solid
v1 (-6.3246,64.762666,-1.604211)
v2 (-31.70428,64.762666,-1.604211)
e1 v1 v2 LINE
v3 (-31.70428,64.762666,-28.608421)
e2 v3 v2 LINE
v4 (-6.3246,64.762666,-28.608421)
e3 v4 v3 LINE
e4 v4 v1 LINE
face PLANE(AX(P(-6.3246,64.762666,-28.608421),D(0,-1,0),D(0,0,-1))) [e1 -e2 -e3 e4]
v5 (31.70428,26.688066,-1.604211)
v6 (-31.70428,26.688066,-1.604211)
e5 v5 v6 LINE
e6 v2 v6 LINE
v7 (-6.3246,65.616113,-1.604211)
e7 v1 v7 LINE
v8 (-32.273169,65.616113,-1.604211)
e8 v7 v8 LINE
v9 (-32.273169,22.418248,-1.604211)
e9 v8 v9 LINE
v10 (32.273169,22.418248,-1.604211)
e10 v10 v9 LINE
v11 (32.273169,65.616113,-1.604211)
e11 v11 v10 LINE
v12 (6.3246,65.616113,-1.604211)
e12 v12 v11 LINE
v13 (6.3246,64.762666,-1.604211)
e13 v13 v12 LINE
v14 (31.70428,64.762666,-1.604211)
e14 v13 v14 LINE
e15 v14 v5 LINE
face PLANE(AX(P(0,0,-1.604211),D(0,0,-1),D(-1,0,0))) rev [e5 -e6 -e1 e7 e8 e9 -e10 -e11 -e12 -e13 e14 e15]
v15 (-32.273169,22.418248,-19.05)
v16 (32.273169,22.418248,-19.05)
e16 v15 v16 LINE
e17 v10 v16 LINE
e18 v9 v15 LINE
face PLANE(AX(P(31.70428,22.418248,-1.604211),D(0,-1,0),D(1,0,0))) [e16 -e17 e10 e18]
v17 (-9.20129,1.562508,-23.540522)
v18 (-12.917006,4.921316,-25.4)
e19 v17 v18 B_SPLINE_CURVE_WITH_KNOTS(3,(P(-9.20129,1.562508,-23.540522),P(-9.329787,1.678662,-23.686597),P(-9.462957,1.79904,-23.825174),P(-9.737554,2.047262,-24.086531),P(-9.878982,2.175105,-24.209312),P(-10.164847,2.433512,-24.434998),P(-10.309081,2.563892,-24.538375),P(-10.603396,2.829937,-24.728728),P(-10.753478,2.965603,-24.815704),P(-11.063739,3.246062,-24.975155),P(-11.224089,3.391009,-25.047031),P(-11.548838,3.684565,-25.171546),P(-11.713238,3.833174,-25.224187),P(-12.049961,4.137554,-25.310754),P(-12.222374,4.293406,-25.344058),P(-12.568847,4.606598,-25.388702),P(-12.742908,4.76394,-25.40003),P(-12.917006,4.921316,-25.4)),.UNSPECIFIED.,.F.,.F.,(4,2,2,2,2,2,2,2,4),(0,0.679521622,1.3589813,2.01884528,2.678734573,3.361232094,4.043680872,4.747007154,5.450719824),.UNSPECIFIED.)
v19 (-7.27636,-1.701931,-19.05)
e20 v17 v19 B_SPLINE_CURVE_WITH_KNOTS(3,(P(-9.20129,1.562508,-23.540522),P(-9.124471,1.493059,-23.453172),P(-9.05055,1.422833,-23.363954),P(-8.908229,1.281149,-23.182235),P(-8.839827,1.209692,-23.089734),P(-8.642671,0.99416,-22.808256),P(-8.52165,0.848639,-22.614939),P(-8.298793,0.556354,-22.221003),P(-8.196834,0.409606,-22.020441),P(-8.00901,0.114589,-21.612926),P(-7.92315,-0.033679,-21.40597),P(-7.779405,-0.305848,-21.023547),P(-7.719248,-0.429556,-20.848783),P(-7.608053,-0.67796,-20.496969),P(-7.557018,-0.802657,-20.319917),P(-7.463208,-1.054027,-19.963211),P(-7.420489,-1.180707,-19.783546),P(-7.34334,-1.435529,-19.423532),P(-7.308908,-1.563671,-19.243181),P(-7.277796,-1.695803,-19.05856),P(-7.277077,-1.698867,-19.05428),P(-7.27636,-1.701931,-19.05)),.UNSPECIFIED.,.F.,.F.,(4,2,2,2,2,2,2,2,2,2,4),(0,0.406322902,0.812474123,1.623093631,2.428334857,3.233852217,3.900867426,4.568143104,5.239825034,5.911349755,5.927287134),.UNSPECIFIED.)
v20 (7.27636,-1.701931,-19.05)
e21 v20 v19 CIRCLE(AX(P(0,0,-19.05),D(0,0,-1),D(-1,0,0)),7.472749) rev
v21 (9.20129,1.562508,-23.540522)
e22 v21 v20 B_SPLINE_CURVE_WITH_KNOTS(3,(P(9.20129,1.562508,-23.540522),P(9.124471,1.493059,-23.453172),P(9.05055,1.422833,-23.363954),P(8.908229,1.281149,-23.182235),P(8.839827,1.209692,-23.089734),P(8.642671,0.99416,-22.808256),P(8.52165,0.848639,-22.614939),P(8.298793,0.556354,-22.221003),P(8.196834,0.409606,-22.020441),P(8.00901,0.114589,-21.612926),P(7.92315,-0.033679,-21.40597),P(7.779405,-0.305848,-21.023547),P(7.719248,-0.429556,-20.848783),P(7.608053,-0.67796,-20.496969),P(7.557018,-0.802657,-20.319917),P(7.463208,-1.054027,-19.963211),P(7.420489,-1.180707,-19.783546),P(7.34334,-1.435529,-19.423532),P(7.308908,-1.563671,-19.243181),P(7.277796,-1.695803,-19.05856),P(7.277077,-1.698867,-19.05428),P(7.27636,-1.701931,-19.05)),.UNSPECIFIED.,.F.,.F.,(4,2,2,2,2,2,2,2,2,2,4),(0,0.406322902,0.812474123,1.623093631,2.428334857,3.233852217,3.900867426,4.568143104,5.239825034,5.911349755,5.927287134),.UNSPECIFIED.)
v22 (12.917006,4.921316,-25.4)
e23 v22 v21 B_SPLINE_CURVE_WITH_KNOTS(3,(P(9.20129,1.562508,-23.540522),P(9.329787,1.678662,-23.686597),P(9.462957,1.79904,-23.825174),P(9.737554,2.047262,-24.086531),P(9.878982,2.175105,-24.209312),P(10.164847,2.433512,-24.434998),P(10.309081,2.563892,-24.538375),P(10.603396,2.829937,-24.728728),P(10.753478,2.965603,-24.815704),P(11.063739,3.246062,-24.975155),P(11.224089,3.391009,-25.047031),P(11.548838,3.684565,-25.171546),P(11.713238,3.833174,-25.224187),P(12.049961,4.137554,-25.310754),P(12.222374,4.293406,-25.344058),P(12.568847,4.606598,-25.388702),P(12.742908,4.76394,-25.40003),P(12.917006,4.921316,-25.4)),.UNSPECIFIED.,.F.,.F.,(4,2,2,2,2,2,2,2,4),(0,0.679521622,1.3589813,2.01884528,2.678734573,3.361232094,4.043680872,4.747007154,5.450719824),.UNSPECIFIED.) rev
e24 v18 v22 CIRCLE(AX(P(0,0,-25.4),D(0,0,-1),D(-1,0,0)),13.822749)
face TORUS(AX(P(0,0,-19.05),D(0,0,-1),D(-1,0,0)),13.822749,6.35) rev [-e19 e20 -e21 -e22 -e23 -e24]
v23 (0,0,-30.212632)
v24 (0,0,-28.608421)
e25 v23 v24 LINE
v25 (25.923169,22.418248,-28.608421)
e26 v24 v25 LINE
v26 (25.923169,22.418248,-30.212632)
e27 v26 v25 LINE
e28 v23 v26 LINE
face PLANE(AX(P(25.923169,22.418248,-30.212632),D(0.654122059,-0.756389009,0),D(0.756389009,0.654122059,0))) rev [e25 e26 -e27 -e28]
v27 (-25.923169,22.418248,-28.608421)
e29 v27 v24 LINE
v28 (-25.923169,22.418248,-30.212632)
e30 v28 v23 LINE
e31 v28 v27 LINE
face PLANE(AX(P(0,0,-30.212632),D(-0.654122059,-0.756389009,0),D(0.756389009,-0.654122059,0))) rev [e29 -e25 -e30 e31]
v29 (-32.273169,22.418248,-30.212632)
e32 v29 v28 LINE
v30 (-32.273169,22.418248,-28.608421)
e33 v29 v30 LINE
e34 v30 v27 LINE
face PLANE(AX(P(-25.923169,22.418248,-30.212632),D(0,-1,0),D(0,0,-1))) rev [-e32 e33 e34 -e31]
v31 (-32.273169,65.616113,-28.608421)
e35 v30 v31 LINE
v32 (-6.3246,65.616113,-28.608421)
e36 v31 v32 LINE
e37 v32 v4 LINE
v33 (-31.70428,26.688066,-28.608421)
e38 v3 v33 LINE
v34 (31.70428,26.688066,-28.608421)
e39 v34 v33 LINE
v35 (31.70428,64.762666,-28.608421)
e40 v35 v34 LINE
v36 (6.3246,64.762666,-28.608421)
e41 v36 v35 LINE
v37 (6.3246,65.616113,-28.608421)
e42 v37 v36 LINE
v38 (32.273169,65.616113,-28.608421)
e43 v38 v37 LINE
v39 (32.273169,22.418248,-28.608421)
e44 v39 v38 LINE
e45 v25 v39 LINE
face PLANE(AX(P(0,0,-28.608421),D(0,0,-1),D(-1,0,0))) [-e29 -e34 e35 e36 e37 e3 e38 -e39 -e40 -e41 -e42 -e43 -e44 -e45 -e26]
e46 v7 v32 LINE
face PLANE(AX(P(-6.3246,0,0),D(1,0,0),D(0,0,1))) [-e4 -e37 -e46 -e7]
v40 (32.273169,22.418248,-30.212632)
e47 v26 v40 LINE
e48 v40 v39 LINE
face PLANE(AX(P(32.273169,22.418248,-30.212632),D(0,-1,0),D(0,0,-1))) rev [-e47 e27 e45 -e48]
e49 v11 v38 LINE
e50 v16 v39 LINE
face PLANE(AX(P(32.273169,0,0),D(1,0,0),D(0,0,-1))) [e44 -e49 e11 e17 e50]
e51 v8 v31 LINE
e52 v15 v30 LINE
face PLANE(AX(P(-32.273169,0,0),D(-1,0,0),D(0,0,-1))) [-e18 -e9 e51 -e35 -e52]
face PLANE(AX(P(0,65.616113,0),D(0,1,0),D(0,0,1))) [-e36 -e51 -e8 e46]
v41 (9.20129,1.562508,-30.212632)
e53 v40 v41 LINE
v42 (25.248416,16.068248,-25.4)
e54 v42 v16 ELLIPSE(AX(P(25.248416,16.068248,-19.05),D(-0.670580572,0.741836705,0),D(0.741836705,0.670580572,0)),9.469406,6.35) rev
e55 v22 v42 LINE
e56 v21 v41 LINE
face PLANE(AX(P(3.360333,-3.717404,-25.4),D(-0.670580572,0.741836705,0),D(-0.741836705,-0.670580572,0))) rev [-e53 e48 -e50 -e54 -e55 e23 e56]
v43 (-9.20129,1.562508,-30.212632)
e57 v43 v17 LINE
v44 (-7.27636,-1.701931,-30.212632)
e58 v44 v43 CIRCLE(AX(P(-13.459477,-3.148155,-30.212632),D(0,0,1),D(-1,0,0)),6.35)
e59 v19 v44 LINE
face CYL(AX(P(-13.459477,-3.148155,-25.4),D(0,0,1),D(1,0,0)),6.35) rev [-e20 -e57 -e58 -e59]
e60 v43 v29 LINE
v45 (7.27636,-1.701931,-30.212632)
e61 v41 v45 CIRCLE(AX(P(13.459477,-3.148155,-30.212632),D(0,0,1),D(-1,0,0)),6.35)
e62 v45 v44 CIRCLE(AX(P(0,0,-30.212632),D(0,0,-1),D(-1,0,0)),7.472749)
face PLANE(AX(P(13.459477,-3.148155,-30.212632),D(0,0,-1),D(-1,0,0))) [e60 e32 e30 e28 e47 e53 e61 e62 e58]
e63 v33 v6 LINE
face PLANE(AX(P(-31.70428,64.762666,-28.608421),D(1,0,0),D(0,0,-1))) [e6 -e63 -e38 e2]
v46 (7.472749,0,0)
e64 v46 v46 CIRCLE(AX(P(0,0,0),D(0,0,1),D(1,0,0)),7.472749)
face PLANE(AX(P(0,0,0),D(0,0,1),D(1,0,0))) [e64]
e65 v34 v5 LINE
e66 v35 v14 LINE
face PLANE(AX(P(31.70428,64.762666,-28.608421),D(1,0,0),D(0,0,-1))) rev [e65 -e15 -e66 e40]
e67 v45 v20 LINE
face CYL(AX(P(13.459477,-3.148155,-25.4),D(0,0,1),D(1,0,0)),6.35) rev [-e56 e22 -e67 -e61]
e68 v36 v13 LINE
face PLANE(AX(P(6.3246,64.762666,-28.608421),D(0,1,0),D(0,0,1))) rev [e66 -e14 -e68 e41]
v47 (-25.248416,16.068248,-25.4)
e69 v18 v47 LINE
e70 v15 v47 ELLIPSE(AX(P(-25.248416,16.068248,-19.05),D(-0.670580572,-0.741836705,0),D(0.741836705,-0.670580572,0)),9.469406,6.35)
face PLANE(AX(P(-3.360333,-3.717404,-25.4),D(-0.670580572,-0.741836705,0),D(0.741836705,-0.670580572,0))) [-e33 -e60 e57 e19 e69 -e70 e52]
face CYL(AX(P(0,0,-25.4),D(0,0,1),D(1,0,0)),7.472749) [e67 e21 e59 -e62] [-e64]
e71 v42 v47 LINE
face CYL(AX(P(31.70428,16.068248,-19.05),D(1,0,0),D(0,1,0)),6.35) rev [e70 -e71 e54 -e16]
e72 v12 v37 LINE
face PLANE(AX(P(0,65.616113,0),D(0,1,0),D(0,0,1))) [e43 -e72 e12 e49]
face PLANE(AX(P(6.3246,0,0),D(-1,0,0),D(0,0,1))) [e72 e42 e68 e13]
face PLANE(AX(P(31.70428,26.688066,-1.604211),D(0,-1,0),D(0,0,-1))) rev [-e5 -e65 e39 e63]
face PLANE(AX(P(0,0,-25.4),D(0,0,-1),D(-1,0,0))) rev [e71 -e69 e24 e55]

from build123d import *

# Parameters (mm, degrees)
SKETCH1_R           = 7.472749452
BOSS_EXTRUDE1_DEPTH = 25.4
SKETCH2_W           = 14.945498904
SKETCH2_H           = 22.418248356
BOSS_EXTRUDE2_DEPTH = 3.20842108
SKETCH4_W           = 63.40856
SKETCH4_H           = 4.26981756
BOSS_EXTRUDE3_DEPTH = 27.00421054
SKETCH6_W           = 27.00421054
SKETCH6_H           = 4.26981756
BOSS_EXTRUDE4_DEPTH = 0.56888896
SKETCH7_W           = 0.56888896
SKETCH7_H           = 27.00421054
BOSS_EXTRUDE5_DEPTH = 38.0746
SKETCH8_W           = 0.56888896
SKETCH8_H           = 27.00421054
BOSS_EXTRUDE6_DEPTH = 0.853447309
SKETCH9_W           = 27.00421054
SKETCH9_H           = 0.853447309
BOSS_EXTRUDE7_DEPTH = 25.37968
BOSS_EXTRUDE8_DEPTH = 3.20842108
FILLET4_R           = 6.35
FILLET5_R           = 6.35
BOSS_EXTRUDE9_DEPTH = 1.60421054


with BuildPart() as part:
    # Sketch1 → Boss-Extrude1 (new body)
    with BuildSketch(Plane.XY):
        Circle(SKETCH1_R)
    extrude(amount=-BOSS_EXTRUDE1_DEPTH)

    # Sketch2 → Boss-Extrude2 (add)
    with BuildSketch(Plane(origin=(0, 0, -25.4), x_dir=(-1, 0, 0), z_dir=(0, 0, -1))):
        with BuildLine():
            ThreePointArc((7.472749452, 0), (0, 7.472749452), (-7.472749452, 0))
            Line((-7.472749452, 0), (7.472749452, 0))
        make_face()
        with BuildLine():
            Line((7.472749452, 0), (-7.472749452, 0))
            ThreePointArc((-7.472749452, 0), (0, -7.472749452), (7.472749452, 0))
        make_face()
        with BuildLine():
            ThreePointArc((7.472749452, 0), (0, 7.472749452), (-7.472749452, 0))
            Line((-7.472749452, 0), (7.472749452, 0))
        make_face()
        with BuildLine():
            Line((7.472749452, 0), (-7.472749452, 0))
            ThreePointArc((-7.472749452, 0), (0, -7.472749452), (7.472749452, 0))
        make_face()
        with Locations((0, 11.209124178)):
            Rectangle(SKETCH2_W, SKETCH2_H)
    extrude(amount=BOSS_EXTRUDE2_DEPTH)

    # Sketch4 → Boss-Extrude3 (add)
    with BuildSketch(Plane(origin=(0, 0, -28.60842108), x_dir=(-1, 0, 0), z_dir=(0, 0, -1))):
        with Locations((0, 24.553157136)):
            Rectangle(SKETCH4_W, SKETCH4_H)
    extrude(amount=-BOSS_EXTRUDE3_DEPTH)

    # Sketch6 → Boss-Extrude4 (add)
    with BuildSketch(Plane(origin=(31.70428, 0, 0), x_dir=(0, 0, -1), z_dir=(1, 0, 0))):
        with Locations((15.10631581, 24.553157136)):
            Rectangle(SKETCH6_W, SKETCH6_H)
    boss_extrude4 = extrude(amount=BOSS_EXTRUDE4_DEPTH)

    # Sketch7 → Boss-Extrude5 (add)
    with BuildSketch(Plane(origin=(0, 26.688065916, 0), x_dir=(1, 0, 0), z_dir=(0, 1, 0))):
        with Locations((31.98872448, 15.10631581)):
            Rectangle(SKETCH7_W, SKETCH7_H)
    boss_extrude5 = extrude(amount=BOSS_EXTRUDE5_DEPTH)

    # Sketch8 → Boss-Extrude6 (add)
    with BuildSketch(Plane(origin=(0, 64.762665916, 0), x_dir=(1, 0, 0), z_dir=(0, 1, 0))):
        with Locations((31.98872448, 15.10631581)):
            Rectangle(SKETCH8_W, SKETCH8_H)
    boss_extrude6 = extrude(amount=BOSS_EXTRUDE6_DEPTH)

    # Sketch9 → Boss-Extrude7 (add)
    with BuildSketch(Plane.ZY.offset(-31.70428)):
        with Locations((-15.10631581, 65.18938957)):
            Rectangle(SKETCH9_W, SKETCH9_H)
    boss_extrude7 = extrude(amount=BOSS_EXTRUDE7_DEPTH)

    # Mirror1: Boss-Extrude4, Boss-Extrude5, Boss-Extrude6, Boss-Extrude7 across plane
    add(boss_extrude4.mirror(Plane(origin=(0, 0, 0), x_dir=(0, 0, 1), z_dir=(1, 0, 0))))
    add(boss_extrude5.mirror(Plane(origin=(0, 0, 0), x_dir=(0, 0, 1), z_dir=(1, 0, 0))))
    add(boss_extrude6.mirror(Plane(origin=(0, 0, 0), x_dir=(0, 0, 1), z_dir=(1, 0, 0))))
    add(boss_extrude7.mirror(Plane(origin=(0, 0, 0), x_dir=(0, 0, 1), z_dir=(1, 0, 0))))

    # Sketch13 → Boss-Extrude8 (add)
    with BuildSketch(Plane(origin=(0, 0, -28.60842108), x_dir=(-1, 0, 0), z_dir=(0, 0, -1))):
        Polygon((-7.472749452, 0), (-32.27316896, 22.418248356), (-7.472749452, 22.418248356), align=None)
        Polygon((7.472749452, 0), (32.27316896, 22.418248356), (7.472749452, 22.418248356), align=None)
    extrude(amount=-BOSS_EXTRUDE8_DEPTH)

    # Fillet4
    fillet4_edges = [part.edges().sort_by_distance(p)[0] for p in [
        (0, 22.418248356, -25.4),
    ]]
    fillet(fillet4_edges, radius=FILLET4_R)

    # Fillet5
    # the kernel refuses this fillet: 6.35 mm, written as the material it adds along each edge
    with BuildSketch(Plane(origin=(0, 0, -25.4), x_dir=(0.003141587485879873, -0.9999950652018582, 0), z_dir=(-0.9999950652018582, -0.003141587485879873, 0))) as fillet5_piece_1_section:
        with BuildLine():
            CenterArc((7.472749452 + FILLET5_R, FILLET5_R), FILLET5_R, 180, 90)
            Line((7.472749452 + FILLET5_R, 0), (7.472749452 + FILLET5_R, -FILLET5_R * 0.02))
            Line((7.472749452 + FILLET5_R, -FILLET5_R * 0.02), (7.472749452 - FILLET5_R * 0.02, -FILLET5_R * 0.02))
            Line((7.472749452 - FILLET5_R * 0.02, -FILLET5_R * 0.02), (7.472749452 - FILLET5_R * 0.02, FILLET5_R))
            Line((7.472749452 - FILLET5_R * 0.02, FILLET5_R), (7.472749452, FILLET5_R))
        make_face()
    fillet5_piece_1 = revolve(axis=Axis((0, 0, -25.4), (0, 0, 1)), revolution_arc=359.64, mode=Mode.PRIVATE)
    fillet5_piece_1 = split(fillet5_piece_1, bisect_by=Plane(origin=(-7.980408712, 0.458896729, -23.585442905), z_dir=(0.6705805717075095, 0.7418367049751783, 0)), keep=Keep.TOP, mode=Mode.PRIVATE)
    fillet5_piece_1 = split(fillet5_piece_1, bisect_by=Plane(origin=(7.980408712, 0.458896729, -23.585442905), z_dir=(-0.6705805717075095, 0.7418367049751783, 0)), keep=Keep.TOP, mode=Mode.PRIVATE)
    add(fillet5_piece_1)
    with BuildSketch(Plane(origin=(7.472749452, 0, -25.4), x_dir=(-0.11463149337271429, -0.9934080836832069, 0), z_dir=(0, 0, -1))) as fillet5_piece_2:
        with BuildLine():
            CenterArc((2.441134842, -6.308141331), FILLET5_R, 96.582370614, 34.723369341)
            Line((-1.750353646, -1.538033968), (-1.834183416, -1.44263182))
            Line((-1.834183416, -1.44263182), (-0.08382977, 0.095402147))
            Line((-0.08382977, 0.095402147), (0.0145582, 0.126162827))
            ThreePointArc((0.0145582, 0.126162827), (0.856612429, 0.077740261), (1.698666659, 0.126162827))
            Line((1.698666659, 0.126162827), (1.713224859, 0))
        make_face()
    extrude(amount=3.20842108)
    with BuildSketch(Plane(origin=(-7.472749452, 0, -25.4), x_dir=(-0.7418367049751787, 0.6705805717075091, 0), z_dir=(0, 0, -1))) as fillet5_piece_3:
        with BuildLine():
            CenterArc((2.330082911, -6.35), FILLET5_R, 90, 34.723369341)
            Line((-1.286971105, -1.1308602), (-1.359312185, -1.026477404))
            ThreePointArc((-1.359312185, -1.026477404), (-0.694800105, -0.507031771), (-0.094213262, 0.085163733))
            Line((-0.094213262, 0.085163733), (0, 0.127))
            Line((0, 0.127), (2.330082911, 0.127))
            Line((2.330082911, 0.127), (2.330082911, 0))
        make_face()
    extrude(amount=3.20842108)
    with BuildSketch(Plane(origin=(7.472749452, 0, -11.419502535), x_dir=(-0.11463149337271447, -0.9934080836832069, 0), z_dir=(0, 0, -1))) as fillet5_piece_4a_section:
        with BuildLine():
            CenterArc((2.441134842, -6.308141331), FILLET5_R, 96.582370614, 34.723369341)
            Line((-1.750353646, -1.538033968), (-1.834183416, -1.44263182))
            Line((-1.834183416, -1.44263182), (-0.08382977, 0.095402147))
            Line((-0.08382977, 0.095402147), (0.0145582, 0.126162827))
            ThreePointArc((0.0145582, 0.126162827), (0.856612429, 0.077740261), (1.698666659, 0.126162827))
            Line((1.698666659, 0.126162827), (1.713224859, 0))
        make_face()
    fillet5_piece_4a = extrude(amount=17.188918545, mode=Mode.PRIVATE)
    fillet5_piece_4a = split(fillet5_piece_4a, bisect_by=Plane(origin=(7.858473842, 0.054386522, -25.4), z_dir=(0, 0, 1)), keep=Keep.TOP, mode=Mode.PRIVATE)
    with BuildSketch(Plane(origin=(0, 0, -25.4), x_dir=(0.003141587485879873, -0.9999950652018582, 0), z_dir=(-0.9999950652018582, -0.003141587485879873, 0))) as fillet5_piece_4b_section:
        with BuildLine():
            CenterArc((7.472749452 + FILLET5_R, FILLET5_R), FILLET5_R, 180, 90)
            Line((7.472749452 + FILLET5_R, 0), (7.472749452 + FILLET5_R, -FILLET5_R * 0.02))
            Line((7.472749452 + FILLET5_R, -FILLET5_R * 0.02), (7.472749452 - FILLET5_R * 0.02, -FILLET5_R * 0.02))
            Line((7.472749452 - FILLET5_R * 0.02, -FILLET5_R * 0.02), (7.472749452 - FILLET5_R * 0.02, FILLET5_R))
            Line((7.472749452 - FILLET5_R * 0.02, FILLET5_R), (7.472749452, FILLET5_R))
        make_face()
    fillet5_piece_4b = revolve(axis=Axis((0, 0, -25.4), (0, 0, 1)), revolution_arc=359.64, mode=Mode.PRIVATE)
    fillet5_piece_4b = split(fillet5_piece_4b, bisect_by=Plane(origin=(2.712448107, -9.20687202, -24.086642783), z_dir=(0.6705805717075095, 0.7418367049751783, 0)), keep=Keep.TOP, mode=Mode.PRIVATE)
    fillet5_piece_4b = split(fillet5_piece_4b, bisect_by=Plane(origin=(4.884392341, -2.339735928, -24.086642783), z_dir=(0.6705805717075095, -0.7418367049751783, 0)), keep=Keep.TOP, mode=Mode.PRIVATE)
    fillet5_piece_4 = fillet5_piece_4a & fillet5_piece_4b
    add(fillet5_piece_4)
    with BuildSketch(Plane(origin=(-7.472749452, 0, -11.419502535), x_dir=(-0.7418367049751784, 0.6705805717075094, 0), z_dir=(0, 0, -1))) as fillet5_piece_5a_section:
        with BuildLine():
            CenterArc((2.330082911, -6.35), FILLET5_R, 90, 34.723369341)
            Line((-1.286971105, -1.1308602), (-1.359312185, -1.026477404))
            ThreePointArc((-1.359312185, -1.026477404), (-0.694800105, -0.507031771), (-0.094213262, 0.085163733))
            Line((-0.094213262, 0.085163733), (0, 0.127))
            Line((0, 0.127), (2.330082911, 0.127))
            Line((2.330082911, 0.127), (2.330082911, 0))
        make_face()
    fillet5_piece_5a = extrude(amount=17.188918545, mode=Mode.PRIVATE)
    fillet5_piece_5a = split(fillet5_piece_5a, bisect_by=Plane(origin=(-7.858473842, 0.054386522, -25.4), z_dir=(0, 0, 1)), keep=Keep.TOP, mode=Mode.PRIVATE)
    with BuildSketch(Plane(origin=(0, 0, -25.4), x_dir=(0.003141587485879873, -0.9999950652018582, 0), z_dir=(-0.9999950652018582, -0.003141587485879873, 0))) as fillet5_piece_5b_section:
        with BuildLine():
            CenterArc((7.472749452 + FILLET5_R, FILLET5_R), FILLET5_R, 180, 90)
            Line((7.472749452 + FILLET5_R, 0), (7.472749452 + FILLET5_R, -FILLET5_R * 0.02))
            Line((7.472749452 + FILLET5_R, -FILLET5_R * 0.02), (7.472749452 - FILLET5_R * 0.02, -FILLET5_R * 0.02))
            Line((7.472749452 - FILLET5_R * 0.02, -FILLET5_R * 0.02), (7.472749452 - FILLET5_R * 0.02, FILLET5_R))
            Line((7.472749452 - FILLET5_R * 0.02, FILLET5_R), (7.472749452, FILLET5_R))
        make_face()
    fillet5_piece_5b = revolve(axis=Axis((0, 0, -25.4), (0, 0, 1)), revolution_arc=359.64, mode=Mode.PRIVATE)
    fillet5_piece_5b = split(fillet5_piece_5b, bisect_by=Plane(origin=(-4.884392341, -2.339735928, -24.086642783), z_dir=(-0.6705805717075095, -0.7418367049751783, 0)), keep=Keep.TOP, mode=Mode.PRIVATE)
    fillet5_piece_5b = split(fillet5_piece_5b, bisect_by=Plane(origin=(-2.712448107, -9.20687202, -24.086642783), z_dir=(-0.6705805717075095, 0.7418367049751783, 0)), keep=Keep.TOP, mode=Mode.PRIVATE)
    fillet5_piece_5 = fillet5_piece_5a & fillet5_piece_5b
    add(fillet5_piece_5)

    # Sketch14 → Boss-Extrude9 (add)
    with BuildSketch(Plane(origin=(0, 0, -28.60842108), x_dir=(-1, 0, 0), z_dir=(0, 0, -1))):
        with BuildLine():
            Line((-32.27316896, 22.418248356), (-25.92316896, 22.418248356))
            Line((-25.92316896, 22.418248356), (0, 0))
            Line((0, 0), (25.92316896, 22.418248356))
            Line((25.92316896, 22.418248356), (32.27316896, 22.418248356))
            Line((32.27316896, 22.418248356), (9.201290481, 1.56250833))
            ThreePointArc((9.201290481, 1.56250833), (7.989618973, 0.077237004), (7.276359928, -1.701931424))
            ThreePointArc((7.276359928, -1.701931424), (0, -7.472749452), (-7.276359928, -1.701931424))
            ThreePointArc((-7.276359928, -1.701931424), (-7.989618973, 0.077237004), (-9.201290481, 1.56250833))
            Line((-9.201290481, 1.56250833), (-32.27316896, 22.418248356))
        make_face()
    extrude(amount=BOSS_EXTRUDE9_DEPTH)


solid = part.part
